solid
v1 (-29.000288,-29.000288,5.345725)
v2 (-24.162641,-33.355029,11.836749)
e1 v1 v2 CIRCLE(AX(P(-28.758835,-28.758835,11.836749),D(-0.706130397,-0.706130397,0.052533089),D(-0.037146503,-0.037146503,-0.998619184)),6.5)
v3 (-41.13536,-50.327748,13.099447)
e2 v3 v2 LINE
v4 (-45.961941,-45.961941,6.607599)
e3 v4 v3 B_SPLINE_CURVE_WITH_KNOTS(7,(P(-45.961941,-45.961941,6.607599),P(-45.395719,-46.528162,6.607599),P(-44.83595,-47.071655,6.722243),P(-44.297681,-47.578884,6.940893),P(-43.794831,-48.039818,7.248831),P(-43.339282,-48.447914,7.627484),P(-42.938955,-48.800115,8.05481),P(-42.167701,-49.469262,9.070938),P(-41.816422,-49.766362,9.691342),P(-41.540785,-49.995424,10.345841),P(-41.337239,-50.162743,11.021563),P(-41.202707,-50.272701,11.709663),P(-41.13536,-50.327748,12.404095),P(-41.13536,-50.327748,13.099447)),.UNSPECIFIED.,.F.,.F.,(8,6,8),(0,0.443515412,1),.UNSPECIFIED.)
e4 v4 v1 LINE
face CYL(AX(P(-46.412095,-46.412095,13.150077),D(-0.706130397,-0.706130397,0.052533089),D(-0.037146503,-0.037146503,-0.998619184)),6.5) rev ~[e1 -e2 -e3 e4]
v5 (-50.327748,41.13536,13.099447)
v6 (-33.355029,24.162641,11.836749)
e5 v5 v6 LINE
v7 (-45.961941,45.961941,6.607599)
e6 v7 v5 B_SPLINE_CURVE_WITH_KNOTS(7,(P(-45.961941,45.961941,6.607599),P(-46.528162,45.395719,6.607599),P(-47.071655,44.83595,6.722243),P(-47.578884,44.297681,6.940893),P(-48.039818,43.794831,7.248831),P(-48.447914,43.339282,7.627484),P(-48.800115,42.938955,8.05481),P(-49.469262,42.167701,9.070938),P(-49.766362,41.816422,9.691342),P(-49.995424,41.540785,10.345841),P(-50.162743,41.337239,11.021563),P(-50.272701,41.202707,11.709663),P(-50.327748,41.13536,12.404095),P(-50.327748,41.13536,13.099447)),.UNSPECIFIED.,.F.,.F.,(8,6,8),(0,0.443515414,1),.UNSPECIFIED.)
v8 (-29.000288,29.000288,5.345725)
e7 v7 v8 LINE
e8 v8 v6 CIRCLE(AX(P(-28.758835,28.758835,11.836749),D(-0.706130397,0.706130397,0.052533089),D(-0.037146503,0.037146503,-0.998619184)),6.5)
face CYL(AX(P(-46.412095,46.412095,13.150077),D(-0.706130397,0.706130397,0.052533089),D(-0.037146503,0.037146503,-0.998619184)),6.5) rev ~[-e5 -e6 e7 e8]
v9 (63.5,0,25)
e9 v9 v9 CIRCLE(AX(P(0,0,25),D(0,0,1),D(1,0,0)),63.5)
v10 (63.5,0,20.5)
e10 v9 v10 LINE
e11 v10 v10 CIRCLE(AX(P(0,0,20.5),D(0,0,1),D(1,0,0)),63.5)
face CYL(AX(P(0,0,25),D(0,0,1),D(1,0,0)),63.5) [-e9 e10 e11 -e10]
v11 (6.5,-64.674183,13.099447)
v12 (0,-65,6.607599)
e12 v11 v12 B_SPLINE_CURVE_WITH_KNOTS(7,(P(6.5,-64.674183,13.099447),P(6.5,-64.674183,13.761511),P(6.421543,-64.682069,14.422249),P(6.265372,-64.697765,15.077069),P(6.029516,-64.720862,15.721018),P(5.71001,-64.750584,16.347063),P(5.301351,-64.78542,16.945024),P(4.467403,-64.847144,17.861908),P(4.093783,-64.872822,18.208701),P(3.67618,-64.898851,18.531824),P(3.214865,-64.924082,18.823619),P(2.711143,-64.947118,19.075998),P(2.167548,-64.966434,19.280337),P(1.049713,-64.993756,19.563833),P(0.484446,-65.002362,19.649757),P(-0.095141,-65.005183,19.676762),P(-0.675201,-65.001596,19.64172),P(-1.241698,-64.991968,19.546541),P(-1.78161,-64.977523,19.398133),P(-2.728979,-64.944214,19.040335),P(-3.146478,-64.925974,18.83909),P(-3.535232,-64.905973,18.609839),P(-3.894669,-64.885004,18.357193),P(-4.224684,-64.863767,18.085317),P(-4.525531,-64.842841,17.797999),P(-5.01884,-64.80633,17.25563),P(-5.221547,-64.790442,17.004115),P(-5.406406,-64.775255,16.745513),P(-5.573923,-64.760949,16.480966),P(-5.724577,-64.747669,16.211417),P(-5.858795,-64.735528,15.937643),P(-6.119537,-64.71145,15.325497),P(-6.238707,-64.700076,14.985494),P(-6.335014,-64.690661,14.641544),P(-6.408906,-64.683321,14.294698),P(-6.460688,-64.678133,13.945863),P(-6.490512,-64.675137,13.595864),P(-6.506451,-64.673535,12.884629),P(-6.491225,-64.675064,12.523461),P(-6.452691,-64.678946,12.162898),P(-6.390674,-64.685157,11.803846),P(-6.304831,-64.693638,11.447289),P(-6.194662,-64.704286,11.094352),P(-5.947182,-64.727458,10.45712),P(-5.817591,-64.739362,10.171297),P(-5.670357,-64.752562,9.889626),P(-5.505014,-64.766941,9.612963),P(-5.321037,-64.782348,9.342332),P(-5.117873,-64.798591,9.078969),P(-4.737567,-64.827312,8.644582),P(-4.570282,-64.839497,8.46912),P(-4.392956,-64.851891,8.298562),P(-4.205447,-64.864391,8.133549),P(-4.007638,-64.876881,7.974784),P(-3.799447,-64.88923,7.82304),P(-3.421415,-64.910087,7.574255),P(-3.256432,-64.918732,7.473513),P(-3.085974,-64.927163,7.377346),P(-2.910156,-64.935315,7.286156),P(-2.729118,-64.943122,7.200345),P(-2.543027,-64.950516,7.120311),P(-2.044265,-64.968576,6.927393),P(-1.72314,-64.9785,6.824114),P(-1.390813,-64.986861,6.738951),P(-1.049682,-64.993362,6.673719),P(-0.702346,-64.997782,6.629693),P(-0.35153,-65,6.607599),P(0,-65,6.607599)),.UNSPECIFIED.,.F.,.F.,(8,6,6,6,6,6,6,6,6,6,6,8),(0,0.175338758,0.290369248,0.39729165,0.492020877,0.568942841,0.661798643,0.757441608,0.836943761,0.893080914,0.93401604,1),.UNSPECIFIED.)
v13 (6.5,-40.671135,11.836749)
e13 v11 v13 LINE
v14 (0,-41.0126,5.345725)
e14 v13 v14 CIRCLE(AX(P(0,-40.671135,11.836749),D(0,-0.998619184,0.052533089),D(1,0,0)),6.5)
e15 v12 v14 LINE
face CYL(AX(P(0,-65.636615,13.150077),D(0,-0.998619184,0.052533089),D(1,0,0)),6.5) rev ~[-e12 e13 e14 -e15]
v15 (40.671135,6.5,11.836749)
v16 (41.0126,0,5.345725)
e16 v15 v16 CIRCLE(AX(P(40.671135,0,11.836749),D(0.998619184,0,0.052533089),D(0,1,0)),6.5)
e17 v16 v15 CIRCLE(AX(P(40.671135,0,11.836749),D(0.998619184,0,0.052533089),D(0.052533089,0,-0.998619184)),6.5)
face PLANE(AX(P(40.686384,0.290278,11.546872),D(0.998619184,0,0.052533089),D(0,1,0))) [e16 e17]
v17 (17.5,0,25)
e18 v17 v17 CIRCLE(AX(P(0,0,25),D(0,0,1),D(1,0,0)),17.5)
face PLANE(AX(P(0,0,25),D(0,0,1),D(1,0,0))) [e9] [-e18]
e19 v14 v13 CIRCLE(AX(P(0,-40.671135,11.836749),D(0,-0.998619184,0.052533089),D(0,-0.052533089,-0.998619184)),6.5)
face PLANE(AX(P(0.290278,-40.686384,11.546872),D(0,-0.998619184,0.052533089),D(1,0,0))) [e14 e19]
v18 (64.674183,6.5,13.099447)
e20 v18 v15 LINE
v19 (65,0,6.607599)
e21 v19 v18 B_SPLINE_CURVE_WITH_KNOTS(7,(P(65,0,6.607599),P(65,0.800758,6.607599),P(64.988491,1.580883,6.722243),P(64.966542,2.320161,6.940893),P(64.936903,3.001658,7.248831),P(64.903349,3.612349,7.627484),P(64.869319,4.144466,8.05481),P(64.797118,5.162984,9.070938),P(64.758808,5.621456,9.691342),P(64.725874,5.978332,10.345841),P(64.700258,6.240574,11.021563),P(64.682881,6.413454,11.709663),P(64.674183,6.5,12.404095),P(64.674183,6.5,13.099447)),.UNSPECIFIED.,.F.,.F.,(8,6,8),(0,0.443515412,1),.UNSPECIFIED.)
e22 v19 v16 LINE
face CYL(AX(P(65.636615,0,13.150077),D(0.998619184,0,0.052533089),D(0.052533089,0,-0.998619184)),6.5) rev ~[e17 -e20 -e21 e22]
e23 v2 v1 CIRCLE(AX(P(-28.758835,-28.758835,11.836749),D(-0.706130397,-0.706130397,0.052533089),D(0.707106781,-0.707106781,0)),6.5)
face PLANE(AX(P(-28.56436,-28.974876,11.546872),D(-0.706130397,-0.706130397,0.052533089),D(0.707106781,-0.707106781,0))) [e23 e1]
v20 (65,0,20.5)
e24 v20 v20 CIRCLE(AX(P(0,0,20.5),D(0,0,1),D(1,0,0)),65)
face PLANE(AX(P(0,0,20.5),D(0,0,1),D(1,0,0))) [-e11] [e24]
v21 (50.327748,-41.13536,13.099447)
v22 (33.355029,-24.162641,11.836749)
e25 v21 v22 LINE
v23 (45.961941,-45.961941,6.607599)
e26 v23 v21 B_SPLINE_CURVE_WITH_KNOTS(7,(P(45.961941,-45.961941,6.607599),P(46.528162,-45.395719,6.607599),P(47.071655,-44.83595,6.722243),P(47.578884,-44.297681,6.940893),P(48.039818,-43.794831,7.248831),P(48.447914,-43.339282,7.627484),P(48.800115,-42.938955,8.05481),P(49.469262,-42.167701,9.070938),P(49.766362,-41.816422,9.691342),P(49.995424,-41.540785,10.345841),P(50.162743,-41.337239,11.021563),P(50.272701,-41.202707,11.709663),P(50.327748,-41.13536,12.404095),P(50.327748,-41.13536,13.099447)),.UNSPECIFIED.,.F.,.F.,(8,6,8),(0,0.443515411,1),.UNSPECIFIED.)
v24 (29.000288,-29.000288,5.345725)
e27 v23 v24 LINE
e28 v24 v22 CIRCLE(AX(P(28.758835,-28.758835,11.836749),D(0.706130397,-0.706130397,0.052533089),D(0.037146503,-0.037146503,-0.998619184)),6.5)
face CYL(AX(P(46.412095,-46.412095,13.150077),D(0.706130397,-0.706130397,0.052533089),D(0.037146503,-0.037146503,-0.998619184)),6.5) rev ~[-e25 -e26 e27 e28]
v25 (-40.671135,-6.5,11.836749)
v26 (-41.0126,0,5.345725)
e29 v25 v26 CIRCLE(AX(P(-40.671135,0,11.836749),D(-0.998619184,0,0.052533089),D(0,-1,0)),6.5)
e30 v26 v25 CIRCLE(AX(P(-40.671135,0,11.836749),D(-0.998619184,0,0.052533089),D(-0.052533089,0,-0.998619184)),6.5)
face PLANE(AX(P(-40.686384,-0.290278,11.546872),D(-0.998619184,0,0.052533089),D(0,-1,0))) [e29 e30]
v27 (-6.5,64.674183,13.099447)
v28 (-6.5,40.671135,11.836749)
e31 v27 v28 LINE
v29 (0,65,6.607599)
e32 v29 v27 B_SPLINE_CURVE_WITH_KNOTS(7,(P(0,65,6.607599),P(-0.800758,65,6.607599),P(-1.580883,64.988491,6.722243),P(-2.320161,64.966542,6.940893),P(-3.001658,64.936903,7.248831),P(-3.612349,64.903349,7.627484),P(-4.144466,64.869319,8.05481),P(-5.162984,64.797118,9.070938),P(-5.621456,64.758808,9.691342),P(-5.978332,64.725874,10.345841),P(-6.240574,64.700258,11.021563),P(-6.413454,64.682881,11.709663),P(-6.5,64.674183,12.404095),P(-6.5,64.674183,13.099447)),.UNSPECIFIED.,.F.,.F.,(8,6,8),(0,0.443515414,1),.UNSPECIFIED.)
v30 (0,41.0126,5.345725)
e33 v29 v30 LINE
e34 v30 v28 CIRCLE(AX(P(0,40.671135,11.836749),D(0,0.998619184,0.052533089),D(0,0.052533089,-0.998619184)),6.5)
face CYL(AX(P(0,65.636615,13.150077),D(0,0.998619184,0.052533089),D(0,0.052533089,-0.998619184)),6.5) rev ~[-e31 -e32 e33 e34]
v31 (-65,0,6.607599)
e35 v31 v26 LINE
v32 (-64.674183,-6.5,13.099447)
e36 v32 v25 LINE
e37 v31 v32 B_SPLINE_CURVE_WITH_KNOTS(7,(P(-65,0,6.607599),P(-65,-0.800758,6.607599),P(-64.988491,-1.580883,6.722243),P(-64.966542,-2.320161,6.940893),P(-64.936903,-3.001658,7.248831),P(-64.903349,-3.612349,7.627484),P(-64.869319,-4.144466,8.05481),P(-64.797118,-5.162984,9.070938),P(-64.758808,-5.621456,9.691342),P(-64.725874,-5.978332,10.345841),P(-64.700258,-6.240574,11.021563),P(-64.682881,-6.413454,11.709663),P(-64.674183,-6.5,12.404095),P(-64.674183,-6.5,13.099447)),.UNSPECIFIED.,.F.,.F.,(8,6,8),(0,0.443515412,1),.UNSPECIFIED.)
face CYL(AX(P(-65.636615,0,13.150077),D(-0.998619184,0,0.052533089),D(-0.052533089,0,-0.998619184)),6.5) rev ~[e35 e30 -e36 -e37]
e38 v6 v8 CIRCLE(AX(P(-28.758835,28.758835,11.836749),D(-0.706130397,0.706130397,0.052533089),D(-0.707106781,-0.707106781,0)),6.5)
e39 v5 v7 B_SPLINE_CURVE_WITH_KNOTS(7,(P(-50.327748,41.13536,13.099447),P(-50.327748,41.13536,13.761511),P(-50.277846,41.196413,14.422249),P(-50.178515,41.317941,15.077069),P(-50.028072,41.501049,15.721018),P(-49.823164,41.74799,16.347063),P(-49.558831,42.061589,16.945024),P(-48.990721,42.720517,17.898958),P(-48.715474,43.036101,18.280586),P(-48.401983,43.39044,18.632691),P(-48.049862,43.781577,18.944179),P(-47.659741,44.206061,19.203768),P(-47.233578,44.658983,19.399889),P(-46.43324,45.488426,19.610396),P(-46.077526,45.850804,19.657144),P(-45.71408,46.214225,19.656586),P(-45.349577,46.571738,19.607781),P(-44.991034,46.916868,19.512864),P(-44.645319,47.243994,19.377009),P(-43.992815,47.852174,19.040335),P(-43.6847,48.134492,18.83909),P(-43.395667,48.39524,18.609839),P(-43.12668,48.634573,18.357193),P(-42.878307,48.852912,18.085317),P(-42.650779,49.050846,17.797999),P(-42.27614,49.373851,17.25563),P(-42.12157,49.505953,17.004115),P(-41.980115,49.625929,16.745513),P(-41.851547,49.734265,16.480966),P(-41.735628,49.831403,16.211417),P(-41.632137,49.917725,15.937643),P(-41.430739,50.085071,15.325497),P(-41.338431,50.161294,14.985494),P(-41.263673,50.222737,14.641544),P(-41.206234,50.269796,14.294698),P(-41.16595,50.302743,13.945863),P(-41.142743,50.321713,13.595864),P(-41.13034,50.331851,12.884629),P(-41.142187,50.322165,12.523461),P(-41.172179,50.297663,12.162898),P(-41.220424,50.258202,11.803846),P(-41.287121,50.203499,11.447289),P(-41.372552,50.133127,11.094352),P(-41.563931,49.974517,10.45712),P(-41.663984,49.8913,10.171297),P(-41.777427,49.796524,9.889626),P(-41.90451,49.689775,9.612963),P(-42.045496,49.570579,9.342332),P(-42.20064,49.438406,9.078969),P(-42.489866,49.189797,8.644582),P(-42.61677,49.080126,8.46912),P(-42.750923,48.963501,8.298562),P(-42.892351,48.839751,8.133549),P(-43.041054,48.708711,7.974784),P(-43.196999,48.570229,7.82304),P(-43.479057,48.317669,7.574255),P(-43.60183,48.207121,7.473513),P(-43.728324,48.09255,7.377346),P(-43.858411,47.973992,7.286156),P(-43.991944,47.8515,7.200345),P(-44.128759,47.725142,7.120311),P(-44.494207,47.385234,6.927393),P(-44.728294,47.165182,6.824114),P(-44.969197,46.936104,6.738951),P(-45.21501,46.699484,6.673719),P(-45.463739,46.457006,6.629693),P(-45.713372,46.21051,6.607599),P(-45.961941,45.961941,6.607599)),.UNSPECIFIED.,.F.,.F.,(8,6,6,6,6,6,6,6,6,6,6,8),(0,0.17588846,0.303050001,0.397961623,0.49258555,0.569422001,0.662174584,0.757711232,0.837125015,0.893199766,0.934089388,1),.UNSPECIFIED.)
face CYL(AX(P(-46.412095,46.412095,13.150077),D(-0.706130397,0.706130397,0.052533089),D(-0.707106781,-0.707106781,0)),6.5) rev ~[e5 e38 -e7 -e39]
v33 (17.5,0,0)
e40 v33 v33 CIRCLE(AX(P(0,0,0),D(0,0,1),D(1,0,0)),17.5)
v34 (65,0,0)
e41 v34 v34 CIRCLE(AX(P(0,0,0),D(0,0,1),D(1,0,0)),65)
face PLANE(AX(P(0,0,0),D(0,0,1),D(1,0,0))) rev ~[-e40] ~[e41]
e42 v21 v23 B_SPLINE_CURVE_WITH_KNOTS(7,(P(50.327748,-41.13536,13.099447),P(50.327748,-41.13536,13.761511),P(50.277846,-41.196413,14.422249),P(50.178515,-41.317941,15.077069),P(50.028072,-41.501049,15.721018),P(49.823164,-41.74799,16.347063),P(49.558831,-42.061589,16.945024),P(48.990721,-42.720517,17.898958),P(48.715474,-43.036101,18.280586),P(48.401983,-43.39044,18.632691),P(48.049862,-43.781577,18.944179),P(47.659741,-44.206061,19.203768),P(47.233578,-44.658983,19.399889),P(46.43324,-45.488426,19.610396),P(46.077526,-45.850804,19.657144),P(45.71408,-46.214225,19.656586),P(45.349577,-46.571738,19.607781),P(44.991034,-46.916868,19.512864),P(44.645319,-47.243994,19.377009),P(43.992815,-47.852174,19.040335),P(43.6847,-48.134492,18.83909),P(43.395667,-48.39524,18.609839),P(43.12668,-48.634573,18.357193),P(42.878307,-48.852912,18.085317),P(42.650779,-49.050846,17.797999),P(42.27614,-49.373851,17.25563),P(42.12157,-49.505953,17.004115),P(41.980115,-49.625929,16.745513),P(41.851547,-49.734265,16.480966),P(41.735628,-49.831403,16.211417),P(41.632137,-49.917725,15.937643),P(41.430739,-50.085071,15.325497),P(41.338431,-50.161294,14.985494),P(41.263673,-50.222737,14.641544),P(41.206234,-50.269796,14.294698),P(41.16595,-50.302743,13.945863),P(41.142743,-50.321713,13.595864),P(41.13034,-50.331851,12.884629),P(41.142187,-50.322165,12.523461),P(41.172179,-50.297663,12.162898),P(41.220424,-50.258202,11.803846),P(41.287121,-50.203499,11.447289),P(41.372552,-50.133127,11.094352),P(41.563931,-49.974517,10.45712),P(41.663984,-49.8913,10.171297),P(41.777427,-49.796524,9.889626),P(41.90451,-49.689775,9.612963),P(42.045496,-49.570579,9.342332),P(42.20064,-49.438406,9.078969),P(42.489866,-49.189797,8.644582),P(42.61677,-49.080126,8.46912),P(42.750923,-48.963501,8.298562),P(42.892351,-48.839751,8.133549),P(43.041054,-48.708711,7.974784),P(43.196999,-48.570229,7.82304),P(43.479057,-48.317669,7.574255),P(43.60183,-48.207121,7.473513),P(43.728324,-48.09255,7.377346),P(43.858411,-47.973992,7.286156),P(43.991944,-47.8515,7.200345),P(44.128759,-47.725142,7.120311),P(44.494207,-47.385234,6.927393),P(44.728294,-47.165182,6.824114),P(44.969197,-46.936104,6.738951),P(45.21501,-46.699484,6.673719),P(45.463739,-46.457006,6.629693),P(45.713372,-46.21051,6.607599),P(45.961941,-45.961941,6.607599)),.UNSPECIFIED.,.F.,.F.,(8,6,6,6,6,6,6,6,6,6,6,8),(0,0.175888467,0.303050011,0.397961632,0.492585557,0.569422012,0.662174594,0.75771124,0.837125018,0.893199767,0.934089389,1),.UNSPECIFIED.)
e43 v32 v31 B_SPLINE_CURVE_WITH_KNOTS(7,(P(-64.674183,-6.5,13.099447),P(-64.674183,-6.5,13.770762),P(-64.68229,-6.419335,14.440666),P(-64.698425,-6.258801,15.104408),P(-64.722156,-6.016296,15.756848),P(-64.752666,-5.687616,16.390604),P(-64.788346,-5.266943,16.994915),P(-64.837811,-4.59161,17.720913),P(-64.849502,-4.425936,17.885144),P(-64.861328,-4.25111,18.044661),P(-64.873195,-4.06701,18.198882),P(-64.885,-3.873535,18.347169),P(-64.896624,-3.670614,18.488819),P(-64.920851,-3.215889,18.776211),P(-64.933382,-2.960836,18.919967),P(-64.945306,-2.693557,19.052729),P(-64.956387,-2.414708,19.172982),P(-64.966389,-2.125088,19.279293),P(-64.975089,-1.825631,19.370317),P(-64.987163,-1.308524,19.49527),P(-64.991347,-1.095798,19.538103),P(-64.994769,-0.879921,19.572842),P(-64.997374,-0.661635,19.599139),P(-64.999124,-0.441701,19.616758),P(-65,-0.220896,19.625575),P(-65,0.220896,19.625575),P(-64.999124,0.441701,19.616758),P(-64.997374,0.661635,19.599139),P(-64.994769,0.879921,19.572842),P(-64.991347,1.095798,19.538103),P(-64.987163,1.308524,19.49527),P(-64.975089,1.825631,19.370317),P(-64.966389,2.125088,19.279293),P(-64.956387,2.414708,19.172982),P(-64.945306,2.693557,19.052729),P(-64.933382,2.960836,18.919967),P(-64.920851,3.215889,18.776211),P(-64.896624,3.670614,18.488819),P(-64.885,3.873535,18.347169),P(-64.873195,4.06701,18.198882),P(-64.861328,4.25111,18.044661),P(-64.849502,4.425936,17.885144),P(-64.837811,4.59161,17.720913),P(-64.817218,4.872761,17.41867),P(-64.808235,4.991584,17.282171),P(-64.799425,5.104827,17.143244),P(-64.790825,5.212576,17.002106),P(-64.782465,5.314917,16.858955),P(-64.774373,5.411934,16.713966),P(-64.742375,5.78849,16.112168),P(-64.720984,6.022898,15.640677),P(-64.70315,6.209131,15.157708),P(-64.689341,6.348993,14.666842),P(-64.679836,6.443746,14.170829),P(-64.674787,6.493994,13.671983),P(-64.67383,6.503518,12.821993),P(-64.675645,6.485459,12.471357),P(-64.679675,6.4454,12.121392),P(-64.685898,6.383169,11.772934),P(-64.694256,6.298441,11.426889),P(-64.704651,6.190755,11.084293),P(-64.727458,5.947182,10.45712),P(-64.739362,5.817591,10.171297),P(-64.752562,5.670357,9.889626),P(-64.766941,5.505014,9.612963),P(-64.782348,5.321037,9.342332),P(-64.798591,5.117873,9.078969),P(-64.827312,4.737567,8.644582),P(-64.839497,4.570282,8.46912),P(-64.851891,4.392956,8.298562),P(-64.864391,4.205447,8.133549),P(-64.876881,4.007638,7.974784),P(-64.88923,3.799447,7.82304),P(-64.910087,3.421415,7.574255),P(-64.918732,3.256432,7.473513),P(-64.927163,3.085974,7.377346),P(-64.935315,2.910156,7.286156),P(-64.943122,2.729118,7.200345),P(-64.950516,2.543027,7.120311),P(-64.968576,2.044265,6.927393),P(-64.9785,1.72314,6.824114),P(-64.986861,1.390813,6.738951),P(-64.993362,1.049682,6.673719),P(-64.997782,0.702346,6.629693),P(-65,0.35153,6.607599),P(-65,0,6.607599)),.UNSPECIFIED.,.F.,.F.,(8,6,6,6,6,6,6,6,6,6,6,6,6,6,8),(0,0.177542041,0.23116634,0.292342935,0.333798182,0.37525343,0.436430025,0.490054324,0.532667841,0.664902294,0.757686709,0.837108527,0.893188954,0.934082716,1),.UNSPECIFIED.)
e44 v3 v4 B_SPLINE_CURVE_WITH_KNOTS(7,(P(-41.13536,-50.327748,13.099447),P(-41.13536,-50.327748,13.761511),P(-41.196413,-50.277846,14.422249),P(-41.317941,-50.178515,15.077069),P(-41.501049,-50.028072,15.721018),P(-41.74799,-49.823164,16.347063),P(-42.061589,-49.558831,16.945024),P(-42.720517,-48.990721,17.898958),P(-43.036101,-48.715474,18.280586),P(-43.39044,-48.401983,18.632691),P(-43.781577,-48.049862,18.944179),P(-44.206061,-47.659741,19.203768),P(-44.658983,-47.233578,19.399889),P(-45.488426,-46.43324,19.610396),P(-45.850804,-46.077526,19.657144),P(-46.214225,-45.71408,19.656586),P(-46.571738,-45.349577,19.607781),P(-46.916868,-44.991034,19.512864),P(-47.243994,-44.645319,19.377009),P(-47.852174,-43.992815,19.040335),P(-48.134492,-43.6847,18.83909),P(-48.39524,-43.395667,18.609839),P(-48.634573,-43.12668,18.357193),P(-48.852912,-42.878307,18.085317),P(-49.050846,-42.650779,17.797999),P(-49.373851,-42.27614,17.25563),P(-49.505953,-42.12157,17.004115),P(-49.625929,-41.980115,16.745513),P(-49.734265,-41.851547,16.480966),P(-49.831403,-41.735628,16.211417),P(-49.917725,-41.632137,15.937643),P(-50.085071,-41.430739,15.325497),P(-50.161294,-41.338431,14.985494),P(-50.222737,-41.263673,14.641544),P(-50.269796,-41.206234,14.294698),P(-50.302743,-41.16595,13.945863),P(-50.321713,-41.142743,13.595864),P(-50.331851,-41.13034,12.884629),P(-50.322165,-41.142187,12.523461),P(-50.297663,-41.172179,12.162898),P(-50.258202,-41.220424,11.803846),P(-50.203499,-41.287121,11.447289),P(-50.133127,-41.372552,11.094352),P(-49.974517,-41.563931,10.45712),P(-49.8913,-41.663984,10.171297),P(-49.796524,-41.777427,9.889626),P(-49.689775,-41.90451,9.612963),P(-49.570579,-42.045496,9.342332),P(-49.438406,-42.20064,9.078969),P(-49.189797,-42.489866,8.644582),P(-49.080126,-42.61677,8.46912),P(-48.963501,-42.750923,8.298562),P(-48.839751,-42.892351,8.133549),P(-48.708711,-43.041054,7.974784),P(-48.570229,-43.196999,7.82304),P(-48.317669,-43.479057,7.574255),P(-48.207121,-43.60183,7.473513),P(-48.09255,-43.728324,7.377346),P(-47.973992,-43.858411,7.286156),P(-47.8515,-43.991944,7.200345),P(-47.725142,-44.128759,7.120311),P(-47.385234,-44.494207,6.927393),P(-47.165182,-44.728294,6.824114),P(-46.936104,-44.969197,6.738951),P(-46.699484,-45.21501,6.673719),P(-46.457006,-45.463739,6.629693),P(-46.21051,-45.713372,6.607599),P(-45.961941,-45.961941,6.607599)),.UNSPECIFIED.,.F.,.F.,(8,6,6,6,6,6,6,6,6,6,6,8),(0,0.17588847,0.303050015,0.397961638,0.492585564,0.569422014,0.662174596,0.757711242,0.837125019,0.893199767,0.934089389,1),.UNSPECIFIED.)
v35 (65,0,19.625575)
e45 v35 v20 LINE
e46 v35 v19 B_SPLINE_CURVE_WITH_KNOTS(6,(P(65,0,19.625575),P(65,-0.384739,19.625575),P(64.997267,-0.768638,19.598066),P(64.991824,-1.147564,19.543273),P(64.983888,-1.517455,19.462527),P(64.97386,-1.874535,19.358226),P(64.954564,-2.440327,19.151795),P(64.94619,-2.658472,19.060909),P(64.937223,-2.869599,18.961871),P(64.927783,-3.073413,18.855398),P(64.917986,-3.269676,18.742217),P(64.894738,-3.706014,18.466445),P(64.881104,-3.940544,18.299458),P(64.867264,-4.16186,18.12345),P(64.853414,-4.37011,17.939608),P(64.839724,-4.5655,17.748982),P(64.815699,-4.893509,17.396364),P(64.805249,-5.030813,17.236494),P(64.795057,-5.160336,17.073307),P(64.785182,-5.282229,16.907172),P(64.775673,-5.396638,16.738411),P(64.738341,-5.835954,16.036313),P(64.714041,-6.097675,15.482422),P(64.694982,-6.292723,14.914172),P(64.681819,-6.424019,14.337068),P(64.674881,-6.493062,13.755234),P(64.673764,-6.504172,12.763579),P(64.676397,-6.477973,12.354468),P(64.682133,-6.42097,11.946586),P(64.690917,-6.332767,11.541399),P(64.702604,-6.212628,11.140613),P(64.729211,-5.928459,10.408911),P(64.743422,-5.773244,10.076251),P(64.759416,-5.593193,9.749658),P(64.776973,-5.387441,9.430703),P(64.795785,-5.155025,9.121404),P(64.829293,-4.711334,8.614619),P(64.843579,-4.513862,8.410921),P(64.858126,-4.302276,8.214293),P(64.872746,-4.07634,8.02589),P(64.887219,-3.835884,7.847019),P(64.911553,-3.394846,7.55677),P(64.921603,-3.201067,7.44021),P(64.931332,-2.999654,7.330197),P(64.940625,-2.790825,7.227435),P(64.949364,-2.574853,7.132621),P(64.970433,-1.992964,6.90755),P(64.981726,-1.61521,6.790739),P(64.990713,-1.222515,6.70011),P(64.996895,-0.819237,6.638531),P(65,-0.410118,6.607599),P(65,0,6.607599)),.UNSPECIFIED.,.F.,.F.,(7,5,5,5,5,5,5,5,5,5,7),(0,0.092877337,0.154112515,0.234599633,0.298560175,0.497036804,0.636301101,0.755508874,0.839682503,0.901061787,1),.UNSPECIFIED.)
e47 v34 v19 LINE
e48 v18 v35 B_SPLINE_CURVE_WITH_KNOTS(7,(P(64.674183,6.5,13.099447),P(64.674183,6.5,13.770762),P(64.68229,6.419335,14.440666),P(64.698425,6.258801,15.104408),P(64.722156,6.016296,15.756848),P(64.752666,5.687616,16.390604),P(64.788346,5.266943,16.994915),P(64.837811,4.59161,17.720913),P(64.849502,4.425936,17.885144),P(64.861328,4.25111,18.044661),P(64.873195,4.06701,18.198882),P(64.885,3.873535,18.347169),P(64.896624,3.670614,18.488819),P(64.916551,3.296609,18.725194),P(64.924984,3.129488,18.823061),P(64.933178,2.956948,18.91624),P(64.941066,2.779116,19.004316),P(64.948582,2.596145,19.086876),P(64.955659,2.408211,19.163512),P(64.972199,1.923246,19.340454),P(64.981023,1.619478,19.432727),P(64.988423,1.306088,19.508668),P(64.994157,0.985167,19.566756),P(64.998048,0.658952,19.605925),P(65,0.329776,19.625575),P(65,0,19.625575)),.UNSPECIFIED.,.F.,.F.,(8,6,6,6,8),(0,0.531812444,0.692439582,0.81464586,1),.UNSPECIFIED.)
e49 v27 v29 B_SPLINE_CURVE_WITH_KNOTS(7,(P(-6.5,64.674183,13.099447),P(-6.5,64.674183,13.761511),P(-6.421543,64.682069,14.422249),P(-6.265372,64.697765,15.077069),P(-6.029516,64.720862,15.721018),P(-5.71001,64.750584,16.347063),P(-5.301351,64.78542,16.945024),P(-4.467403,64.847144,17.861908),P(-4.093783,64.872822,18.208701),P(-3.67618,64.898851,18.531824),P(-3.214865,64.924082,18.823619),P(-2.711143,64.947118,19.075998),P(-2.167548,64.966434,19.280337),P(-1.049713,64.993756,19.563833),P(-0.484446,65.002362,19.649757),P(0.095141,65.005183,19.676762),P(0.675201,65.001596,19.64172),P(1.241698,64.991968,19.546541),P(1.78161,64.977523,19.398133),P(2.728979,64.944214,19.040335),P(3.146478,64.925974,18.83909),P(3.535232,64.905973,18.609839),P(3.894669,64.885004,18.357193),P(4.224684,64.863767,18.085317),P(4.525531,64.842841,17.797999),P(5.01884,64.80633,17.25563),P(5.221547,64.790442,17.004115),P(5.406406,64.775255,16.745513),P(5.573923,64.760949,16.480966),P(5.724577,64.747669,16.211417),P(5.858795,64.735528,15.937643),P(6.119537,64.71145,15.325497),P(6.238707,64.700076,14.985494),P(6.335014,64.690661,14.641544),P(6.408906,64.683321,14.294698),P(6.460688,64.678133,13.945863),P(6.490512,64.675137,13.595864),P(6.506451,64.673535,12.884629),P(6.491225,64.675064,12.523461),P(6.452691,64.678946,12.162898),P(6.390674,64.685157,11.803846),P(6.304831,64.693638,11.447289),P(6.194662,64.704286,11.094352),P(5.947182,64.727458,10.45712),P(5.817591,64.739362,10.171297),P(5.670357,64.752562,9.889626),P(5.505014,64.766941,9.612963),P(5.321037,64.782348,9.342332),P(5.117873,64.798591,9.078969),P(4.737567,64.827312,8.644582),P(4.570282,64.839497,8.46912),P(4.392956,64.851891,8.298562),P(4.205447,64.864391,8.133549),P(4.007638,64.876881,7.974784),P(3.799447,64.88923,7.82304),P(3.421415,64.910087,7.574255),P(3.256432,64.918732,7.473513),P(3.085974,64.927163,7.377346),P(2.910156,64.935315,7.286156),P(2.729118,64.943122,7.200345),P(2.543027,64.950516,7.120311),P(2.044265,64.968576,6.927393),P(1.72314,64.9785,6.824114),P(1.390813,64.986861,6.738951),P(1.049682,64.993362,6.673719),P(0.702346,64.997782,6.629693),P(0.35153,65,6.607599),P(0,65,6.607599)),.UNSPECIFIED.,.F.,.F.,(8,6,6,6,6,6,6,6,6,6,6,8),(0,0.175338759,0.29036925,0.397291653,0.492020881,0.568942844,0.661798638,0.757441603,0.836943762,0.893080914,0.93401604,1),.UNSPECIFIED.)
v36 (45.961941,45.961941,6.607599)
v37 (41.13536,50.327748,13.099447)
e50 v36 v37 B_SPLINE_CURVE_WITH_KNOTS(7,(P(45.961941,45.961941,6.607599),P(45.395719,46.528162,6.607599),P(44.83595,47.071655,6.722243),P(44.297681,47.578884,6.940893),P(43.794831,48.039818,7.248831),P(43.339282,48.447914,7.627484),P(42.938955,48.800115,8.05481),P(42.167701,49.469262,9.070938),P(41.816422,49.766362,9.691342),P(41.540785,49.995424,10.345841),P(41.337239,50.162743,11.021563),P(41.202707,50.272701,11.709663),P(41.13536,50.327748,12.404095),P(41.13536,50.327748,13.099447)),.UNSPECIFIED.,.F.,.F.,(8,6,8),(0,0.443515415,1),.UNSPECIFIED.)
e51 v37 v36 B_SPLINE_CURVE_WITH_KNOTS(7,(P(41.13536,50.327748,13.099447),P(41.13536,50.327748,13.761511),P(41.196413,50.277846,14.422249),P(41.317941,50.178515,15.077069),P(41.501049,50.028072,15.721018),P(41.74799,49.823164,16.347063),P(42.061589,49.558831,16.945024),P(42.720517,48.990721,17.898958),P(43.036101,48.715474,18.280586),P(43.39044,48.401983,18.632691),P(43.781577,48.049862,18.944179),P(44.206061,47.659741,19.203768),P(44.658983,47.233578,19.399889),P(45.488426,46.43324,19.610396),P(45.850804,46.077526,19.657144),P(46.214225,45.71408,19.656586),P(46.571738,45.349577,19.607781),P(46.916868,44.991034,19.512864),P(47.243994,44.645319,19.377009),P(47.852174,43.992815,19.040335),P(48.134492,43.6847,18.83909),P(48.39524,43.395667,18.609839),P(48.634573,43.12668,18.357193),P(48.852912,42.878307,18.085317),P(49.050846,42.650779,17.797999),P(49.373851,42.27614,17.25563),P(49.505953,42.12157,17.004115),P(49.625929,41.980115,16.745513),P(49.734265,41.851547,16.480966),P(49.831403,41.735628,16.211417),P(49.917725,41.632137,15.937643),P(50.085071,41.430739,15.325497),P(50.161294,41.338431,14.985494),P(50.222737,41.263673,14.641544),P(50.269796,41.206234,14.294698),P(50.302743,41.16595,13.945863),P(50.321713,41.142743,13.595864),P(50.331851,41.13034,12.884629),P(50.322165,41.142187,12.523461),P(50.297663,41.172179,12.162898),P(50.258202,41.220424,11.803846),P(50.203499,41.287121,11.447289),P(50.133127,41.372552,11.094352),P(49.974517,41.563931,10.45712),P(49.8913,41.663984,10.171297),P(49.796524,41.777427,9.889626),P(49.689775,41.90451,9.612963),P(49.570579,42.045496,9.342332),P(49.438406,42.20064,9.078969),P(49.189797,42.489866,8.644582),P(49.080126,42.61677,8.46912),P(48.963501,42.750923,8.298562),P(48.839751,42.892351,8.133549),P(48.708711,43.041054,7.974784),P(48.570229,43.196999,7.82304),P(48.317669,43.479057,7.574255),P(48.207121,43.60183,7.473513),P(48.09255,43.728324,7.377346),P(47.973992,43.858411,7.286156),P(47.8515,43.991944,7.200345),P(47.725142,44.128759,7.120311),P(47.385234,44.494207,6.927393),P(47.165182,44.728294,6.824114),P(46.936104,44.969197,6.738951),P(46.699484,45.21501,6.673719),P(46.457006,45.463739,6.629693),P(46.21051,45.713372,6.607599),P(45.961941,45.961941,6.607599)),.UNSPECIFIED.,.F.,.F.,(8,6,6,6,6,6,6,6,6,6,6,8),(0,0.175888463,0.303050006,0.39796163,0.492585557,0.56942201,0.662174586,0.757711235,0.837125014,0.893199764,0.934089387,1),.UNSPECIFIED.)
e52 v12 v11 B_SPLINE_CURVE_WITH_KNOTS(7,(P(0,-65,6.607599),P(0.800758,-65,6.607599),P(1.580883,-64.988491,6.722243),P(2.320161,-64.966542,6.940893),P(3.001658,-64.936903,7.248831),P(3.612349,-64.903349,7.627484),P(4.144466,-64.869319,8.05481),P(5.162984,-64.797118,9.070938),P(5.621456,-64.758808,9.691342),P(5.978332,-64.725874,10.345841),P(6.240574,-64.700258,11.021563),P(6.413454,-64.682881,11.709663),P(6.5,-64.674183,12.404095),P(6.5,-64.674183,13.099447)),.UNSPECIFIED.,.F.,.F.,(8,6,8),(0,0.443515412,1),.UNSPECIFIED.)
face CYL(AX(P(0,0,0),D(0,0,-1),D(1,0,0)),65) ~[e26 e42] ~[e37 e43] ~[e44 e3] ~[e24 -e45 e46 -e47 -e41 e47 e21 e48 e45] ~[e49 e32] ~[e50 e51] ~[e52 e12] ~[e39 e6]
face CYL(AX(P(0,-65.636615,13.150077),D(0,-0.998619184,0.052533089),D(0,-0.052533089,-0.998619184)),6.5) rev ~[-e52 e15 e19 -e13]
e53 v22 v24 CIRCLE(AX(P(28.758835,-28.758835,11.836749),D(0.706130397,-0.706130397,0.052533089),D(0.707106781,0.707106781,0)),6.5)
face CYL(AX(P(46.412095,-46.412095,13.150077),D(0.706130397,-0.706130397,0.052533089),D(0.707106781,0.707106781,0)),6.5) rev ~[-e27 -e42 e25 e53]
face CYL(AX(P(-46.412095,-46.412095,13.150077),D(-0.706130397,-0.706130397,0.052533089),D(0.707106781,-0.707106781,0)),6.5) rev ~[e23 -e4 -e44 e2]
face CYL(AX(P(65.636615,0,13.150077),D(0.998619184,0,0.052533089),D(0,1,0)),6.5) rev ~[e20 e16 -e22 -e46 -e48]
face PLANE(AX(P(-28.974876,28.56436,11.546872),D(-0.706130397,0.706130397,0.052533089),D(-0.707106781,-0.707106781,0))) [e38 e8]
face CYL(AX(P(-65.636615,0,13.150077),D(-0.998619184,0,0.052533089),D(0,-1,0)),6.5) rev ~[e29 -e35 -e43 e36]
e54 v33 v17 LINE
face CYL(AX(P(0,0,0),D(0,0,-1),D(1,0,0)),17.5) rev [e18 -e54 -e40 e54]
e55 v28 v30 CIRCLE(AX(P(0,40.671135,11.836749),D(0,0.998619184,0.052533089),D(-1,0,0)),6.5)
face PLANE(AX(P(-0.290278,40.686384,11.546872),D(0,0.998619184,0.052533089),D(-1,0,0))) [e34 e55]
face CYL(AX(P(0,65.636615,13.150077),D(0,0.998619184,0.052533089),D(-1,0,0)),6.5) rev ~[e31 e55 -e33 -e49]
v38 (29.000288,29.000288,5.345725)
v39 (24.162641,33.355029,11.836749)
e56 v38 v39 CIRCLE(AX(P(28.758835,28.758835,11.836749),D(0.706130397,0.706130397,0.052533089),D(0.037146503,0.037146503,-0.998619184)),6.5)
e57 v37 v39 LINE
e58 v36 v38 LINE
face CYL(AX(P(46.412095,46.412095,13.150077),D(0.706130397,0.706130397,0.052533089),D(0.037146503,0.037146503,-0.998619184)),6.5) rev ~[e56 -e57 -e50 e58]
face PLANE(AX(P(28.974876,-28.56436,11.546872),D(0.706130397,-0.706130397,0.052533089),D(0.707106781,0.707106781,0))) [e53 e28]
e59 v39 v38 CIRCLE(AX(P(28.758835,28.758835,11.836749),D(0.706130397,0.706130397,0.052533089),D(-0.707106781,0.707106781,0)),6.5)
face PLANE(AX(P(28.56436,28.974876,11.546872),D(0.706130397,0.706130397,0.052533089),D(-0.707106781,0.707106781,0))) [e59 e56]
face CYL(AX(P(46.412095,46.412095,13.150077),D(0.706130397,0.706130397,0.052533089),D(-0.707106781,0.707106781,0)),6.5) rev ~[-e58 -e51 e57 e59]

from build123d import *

# Parameters (mm, degrees)
F0_R            = 65
F0_R_2          = 17.5
F1_DEPTH        = 25
F9_DEPTH        = 25
F9_COPIES_COUNT = 8
F10_R           = 65
F10_R_2         = 63.5
F11_DEPTH       = 4.5


# Not quite as in the source:
# - a pattern or mirror of a feature is missing from the dataset's text; its kind, count and spacing are read off the source's solid


with BuildPart() as f1:
    # F0 (on Top) → F1 (new body)
    with BuildSketch(Plane.XY):
        Circle(F0_R)
        Circle(F0_R_2, mode=Mode.SUBTRACT)
    extrude(amount=F1_DEPTH)

    # F8 (on 3pt) → F9 (cut)
    with BuildSketch(Plane(origin=(0, 66.1453359033, 3.4796235199), x_dir=(-1, 0, 0), z_dir=(0, 0.998619184, 0.0525330887))):
        with BuildLine():
            ThreePointArc((0, 3.1838245746), (4.5961940777, 5.0876304969), (6.5, 9.6838245746))
            ThreePointArc((6.5, 9.6838245746), (-4.5961940777, 14.2800186523), (0, 3.1838245746))
        make_face()
    f9 = extrude(amount=-F9_DEPTH, mode=Mode.SUBTRACT)

    # F9_copies: F9 ×8 about axis
    f9_copies_axis = Axis((0, 0, 0), (0, 0, 1))
    for i in range(1, F9_COPIES_COUNT):
        add(f9.rotate(f9_copies_axis, i * 360 / F9_COPIES_COUNT), mode=Mode.SUBTRACT)

    # F10 (on face) → F11 (cut)
    with BuildSketch(Plane.XY.offset(25)):
        Circle(F10_R)
        Circle(F10_R_2, mode=Mode.SUBTRACT)
    extrude(amount=-F11_DEPTH, mode=Mode.SUBTRACT)


solid = f1.part
